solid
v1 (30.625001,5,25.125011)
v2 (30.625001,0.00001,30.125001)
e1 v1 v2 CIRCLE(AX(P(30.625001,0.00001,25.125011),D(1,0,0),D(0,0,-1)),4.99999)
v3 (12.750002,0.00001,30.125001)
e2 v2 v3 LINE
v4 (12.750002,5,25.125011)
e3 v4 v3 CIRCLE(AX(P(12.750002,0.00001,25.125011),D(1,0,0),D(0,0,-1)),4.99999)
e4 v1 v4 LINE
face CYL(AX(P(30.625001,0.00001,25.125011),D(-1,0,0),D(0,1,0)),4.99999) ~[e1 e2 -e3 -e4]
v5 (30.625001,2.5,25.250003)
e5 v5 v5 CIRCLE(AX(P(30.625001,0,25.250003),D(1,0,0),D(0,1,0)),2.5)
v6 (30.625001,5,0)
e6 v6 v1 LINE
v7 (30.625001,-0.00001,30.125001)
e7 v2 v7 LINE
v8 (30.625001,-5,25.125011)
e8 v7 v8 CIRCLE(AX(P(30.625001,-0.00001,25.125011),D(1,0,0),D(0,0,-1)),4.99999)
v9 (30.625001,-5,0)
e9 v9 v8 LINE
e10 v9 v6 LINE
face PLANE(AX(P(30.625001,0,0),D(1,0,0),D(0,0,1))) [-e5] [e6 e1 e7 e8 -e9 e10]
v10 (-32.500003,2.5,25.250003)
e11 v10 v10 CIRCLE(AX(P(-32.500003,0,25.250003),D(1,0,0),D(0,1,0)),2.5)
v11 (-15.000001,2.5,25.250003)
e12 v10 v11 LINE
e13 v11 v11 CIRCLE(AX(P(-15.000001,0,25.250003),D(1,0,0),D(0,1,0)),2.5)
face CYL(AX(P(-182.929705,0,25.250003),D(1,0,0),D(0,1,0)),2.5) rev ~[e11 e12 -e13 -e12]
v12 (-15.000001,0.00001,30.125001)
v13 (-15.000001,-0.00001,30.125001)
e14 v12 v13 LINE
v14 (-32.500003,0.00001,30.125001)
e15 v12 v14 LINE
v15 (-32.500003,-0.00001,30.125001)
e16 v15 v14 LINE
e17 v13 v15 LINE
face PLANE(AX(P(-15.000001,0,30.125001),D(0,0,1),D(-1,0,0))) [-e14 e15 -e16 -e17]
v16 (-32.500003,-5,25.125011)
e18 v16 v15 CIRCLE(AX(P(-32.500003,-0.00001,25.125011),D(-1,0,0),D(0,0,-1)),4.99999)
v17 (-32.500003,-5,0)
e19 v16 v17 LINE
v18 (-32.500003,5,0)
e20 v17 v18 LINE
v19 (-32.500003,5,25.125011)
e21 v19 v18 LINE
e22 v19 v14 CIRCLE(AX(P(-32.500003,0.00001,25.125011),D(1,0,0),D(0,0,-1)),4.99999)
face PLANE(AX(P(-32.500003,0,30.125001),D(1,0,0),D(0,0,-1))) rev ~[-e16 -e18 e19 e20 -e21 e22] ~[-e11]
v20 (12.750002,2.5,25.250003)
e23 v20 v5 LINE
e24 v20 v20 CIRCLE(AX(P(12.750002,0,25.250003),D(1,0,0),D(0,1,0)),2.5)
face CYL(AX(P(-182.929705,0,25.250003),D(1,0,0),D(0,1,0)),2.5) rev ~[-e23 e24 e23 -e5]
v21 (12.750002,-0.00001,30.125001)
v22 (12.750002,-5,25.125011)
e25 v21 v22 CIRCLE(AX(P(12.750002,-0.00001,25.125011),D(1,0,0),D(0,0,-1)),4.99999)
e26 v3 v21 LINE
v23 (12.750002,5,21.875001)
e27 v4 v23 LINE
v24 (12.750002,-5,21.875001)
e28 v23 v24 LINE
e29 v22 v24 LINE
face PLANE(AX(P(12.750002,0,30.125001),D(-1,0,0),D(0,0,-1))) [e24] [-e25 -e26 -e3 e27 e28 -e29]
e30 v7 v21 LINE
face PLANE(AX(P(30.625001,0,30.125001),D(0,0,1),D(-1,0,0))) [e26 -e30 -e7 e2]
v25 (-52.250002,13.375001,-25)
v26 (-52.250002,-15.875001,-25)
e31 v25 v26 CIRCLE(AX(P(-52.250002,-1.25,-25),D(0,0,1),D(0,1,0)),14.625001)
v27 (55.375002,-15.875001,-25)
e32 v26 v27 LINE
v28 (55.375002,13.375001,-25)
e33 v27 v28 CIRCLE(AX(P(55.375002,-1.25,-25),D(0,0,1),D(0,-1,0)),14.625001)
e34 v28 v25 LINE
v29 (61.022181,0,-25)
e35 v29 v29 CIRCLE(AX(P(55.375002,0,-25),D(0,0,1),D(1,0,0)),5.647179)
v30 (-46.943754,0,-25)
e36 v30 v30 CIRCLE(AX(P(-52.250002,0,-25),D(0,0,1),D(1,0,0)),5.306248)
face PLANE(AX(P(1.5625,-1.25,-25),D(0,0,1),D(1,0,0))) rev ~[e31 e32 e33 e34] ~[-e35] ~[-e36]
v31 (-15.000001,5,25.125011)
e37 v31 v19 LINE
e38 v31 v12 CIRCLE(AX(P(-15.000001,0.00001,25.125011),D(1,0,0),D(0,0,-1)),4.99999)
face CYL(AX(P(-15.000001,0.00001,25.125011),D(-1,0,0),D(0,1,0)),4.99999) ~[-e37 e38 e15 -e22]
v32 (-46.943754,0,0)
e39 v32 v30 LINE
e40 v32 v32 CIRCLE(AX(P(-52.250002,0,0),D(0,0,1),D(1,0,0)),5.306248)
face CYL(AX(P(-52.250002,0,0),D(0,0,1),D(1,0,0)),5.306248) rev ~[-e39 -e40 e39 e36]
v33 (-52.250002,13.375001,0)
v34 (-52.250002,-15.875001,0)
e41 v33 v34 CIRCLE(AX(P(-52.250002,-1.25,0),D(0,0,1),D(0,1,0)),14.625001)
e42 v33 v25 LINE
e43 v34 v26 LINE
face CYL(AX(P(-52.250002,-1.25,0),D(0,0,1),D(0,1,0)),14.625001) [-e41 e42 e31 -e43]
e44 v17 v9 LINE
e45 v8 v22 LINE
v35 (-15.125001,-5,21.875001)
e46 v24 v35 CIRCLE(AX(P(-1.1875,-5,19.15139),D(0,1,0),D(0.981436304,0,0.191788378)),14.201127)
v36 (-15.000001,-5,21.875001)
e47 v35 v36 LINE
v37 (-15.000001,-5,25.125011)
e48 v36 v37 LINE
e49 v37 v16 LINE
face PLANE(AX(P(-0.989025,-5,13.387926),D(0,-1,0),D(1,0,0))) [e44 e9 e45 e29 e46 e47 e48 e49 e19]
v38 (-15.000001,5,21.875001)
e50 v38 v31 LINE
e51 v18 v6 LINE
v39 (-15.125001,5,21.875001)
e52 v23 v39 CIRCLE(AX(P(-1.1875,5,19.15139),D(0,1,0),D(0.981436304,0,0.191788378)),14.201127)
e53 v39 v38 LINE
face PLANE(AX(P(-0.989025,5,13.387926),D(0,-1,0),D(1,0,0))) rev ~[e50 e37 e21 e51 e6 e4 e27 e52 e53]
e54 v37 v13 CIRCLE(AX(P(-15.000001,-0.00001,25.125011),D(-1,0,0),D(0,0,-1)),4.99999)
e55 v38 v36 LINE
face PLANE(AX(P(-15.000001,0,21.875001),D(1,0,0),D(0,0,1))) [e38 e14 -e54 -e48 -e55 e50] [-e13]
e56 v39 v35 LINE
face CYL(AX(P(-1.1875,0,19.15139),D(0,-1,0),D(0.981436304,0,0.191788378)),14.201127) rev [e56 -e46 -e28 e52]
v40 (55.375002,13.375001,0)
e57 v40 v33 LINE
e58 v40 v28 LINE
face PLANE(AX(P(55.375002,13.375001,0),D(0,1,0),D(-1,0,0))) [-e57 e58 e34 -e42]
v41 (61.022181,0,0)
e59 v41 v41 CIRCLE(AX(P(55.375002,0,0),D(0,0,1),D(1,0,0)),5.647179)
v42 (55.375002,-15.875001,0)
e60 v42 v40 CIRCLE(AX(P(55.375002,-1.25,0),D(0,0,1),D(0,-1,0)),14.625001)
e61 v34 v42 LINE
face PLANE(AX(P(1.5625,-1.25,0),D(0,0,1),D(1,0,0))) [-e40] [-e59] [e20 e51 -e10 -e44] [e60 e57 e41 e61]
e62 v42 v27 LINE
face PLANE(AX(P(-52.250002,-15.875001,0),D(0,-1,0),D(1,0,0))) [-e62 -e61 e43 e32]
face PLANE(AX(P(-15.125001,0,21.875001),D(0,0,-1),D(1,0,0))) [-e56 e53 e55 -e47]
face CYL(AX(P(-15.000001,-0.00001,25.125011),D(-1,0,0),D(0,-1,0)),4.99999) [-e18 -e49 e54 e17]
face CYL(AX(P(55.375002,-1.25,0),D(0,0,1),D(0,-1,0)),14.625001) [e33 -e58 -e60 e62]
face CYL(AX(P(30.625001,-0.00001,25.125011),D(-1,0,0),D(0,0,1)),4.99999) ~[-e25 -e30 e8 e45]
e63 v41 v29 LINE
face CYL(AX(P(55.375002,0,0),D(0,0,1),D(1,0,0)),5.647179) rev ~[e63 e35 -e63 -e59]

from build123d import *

# Parameters (mm, degrees)
F0_R          = 5.3062476442
F0_R_2        = 5.6471789454
F2_DEPTH      = 25
F3_DEPTH      = 5
F3_DEPTH_BACK = 5
F5_D          = 5
F6_R          = 4.99999


# Not quite as in the source:
# - a fillet or chamfer is up to 0.001 mm smaller than in the source, because OpenCascade refuses the exact size


with BuildPart() as f2:
    # F0 (on Top) → F2 (new body)
    with BuildSketch(Plane.XY):
        with BuildLine():
            Line((55.3750023246, 13.3750010282), (-52.2500015795, 13.3750010282))
            ThreePointArc((-52.2500015795, 13.3750010282), (-66.8750023469, -1.2499997392), (-52.2500015795, -15.8750005066))
            Line((-52.2500015795, -15.8750005066), (55.3750023246, -15.8750005066))
            ThreePointArc((55.3750023246, -15.8750005066), (70.000003092, -1.2499997392), (55.3750023246, 13.3750010282))
        make_face()
        with Locations((-52.2500015795, 0)):
            Circle(F0_R, mode=Mode.SUBTRACT)
        with Locations((55.3750023246, 0)):
            Circle(F0_R_2, mode=Mode.SUBTRACT)
    extrude(amount=-F2_DEPTH)

    # F1 (on Front) → F3 (join, two sides)
    with BuildSketch(Plane.XZ) as f3_sk:
        with BuildLine():
            Line((-32.5000025332, 21.8750014901), (-32.5000025332, 0))
            Line((-32.5000025332, 0), (30.625000596, 0))
            Line((30.625000596, 0), (30.625000596, 21.8750014901))
            Line((30.625000596, 21.8750014901), (30.625000596, 30.1250014454))
            Line((30.625000596, 30.1250014454), (12.7500016242, 30.1250014454))
            Line((12.7500016242, 30.1250014454), (12.7500016242, 21.8750014901))
            ThreePointArc((12.7500016242, 21.8750014901), (-1.1874996126, 4.9502638014), (-15.1250008494, 21.8750014901))
            Line((-15.1250008494, 21.8750014901), (-15.000000596, 21.8750014901))
            Line((-15.000000596, 21.8750014901), (-15.000000596, 30.1250014454))
            Line((-15.000000596, 30.1250014454), (-32.5000025332, 30.1250014454))
            Line((-32.5000025332, 30.1250014454), (-32.5000025332, 21.8750014901))
        make_face()
    extrude(amount=F3_DEPTH)
    extrude(f3_sk.sketch, amount=-F3_DEPTH_BACK)

    # F5 (through all)
    with Locations(Plane(origin=(-32.5000025332, 0, 0), x_dir=(0, -1, 0), z_dir=(-1, 0, 0))):
        with Locations((0, 25.2500027418)):
            Hole(F5_D / 2)

    # F6 (radius 5 in the source; OpenCascade refuses exactly that, so slightly less here)
    f6_edges = [f2.edges().sort_by_distance(p)[0] for p in [
        (21.687501, 5, 30.125001),
        (21.687501, -5, 30.125001),
        (-23.750002, 5, 30.125001),
        (-23.750002, -5, 30.125001),
    ]]
    fillet(f6_edges, radius=F6_R)


solid = f2.part
